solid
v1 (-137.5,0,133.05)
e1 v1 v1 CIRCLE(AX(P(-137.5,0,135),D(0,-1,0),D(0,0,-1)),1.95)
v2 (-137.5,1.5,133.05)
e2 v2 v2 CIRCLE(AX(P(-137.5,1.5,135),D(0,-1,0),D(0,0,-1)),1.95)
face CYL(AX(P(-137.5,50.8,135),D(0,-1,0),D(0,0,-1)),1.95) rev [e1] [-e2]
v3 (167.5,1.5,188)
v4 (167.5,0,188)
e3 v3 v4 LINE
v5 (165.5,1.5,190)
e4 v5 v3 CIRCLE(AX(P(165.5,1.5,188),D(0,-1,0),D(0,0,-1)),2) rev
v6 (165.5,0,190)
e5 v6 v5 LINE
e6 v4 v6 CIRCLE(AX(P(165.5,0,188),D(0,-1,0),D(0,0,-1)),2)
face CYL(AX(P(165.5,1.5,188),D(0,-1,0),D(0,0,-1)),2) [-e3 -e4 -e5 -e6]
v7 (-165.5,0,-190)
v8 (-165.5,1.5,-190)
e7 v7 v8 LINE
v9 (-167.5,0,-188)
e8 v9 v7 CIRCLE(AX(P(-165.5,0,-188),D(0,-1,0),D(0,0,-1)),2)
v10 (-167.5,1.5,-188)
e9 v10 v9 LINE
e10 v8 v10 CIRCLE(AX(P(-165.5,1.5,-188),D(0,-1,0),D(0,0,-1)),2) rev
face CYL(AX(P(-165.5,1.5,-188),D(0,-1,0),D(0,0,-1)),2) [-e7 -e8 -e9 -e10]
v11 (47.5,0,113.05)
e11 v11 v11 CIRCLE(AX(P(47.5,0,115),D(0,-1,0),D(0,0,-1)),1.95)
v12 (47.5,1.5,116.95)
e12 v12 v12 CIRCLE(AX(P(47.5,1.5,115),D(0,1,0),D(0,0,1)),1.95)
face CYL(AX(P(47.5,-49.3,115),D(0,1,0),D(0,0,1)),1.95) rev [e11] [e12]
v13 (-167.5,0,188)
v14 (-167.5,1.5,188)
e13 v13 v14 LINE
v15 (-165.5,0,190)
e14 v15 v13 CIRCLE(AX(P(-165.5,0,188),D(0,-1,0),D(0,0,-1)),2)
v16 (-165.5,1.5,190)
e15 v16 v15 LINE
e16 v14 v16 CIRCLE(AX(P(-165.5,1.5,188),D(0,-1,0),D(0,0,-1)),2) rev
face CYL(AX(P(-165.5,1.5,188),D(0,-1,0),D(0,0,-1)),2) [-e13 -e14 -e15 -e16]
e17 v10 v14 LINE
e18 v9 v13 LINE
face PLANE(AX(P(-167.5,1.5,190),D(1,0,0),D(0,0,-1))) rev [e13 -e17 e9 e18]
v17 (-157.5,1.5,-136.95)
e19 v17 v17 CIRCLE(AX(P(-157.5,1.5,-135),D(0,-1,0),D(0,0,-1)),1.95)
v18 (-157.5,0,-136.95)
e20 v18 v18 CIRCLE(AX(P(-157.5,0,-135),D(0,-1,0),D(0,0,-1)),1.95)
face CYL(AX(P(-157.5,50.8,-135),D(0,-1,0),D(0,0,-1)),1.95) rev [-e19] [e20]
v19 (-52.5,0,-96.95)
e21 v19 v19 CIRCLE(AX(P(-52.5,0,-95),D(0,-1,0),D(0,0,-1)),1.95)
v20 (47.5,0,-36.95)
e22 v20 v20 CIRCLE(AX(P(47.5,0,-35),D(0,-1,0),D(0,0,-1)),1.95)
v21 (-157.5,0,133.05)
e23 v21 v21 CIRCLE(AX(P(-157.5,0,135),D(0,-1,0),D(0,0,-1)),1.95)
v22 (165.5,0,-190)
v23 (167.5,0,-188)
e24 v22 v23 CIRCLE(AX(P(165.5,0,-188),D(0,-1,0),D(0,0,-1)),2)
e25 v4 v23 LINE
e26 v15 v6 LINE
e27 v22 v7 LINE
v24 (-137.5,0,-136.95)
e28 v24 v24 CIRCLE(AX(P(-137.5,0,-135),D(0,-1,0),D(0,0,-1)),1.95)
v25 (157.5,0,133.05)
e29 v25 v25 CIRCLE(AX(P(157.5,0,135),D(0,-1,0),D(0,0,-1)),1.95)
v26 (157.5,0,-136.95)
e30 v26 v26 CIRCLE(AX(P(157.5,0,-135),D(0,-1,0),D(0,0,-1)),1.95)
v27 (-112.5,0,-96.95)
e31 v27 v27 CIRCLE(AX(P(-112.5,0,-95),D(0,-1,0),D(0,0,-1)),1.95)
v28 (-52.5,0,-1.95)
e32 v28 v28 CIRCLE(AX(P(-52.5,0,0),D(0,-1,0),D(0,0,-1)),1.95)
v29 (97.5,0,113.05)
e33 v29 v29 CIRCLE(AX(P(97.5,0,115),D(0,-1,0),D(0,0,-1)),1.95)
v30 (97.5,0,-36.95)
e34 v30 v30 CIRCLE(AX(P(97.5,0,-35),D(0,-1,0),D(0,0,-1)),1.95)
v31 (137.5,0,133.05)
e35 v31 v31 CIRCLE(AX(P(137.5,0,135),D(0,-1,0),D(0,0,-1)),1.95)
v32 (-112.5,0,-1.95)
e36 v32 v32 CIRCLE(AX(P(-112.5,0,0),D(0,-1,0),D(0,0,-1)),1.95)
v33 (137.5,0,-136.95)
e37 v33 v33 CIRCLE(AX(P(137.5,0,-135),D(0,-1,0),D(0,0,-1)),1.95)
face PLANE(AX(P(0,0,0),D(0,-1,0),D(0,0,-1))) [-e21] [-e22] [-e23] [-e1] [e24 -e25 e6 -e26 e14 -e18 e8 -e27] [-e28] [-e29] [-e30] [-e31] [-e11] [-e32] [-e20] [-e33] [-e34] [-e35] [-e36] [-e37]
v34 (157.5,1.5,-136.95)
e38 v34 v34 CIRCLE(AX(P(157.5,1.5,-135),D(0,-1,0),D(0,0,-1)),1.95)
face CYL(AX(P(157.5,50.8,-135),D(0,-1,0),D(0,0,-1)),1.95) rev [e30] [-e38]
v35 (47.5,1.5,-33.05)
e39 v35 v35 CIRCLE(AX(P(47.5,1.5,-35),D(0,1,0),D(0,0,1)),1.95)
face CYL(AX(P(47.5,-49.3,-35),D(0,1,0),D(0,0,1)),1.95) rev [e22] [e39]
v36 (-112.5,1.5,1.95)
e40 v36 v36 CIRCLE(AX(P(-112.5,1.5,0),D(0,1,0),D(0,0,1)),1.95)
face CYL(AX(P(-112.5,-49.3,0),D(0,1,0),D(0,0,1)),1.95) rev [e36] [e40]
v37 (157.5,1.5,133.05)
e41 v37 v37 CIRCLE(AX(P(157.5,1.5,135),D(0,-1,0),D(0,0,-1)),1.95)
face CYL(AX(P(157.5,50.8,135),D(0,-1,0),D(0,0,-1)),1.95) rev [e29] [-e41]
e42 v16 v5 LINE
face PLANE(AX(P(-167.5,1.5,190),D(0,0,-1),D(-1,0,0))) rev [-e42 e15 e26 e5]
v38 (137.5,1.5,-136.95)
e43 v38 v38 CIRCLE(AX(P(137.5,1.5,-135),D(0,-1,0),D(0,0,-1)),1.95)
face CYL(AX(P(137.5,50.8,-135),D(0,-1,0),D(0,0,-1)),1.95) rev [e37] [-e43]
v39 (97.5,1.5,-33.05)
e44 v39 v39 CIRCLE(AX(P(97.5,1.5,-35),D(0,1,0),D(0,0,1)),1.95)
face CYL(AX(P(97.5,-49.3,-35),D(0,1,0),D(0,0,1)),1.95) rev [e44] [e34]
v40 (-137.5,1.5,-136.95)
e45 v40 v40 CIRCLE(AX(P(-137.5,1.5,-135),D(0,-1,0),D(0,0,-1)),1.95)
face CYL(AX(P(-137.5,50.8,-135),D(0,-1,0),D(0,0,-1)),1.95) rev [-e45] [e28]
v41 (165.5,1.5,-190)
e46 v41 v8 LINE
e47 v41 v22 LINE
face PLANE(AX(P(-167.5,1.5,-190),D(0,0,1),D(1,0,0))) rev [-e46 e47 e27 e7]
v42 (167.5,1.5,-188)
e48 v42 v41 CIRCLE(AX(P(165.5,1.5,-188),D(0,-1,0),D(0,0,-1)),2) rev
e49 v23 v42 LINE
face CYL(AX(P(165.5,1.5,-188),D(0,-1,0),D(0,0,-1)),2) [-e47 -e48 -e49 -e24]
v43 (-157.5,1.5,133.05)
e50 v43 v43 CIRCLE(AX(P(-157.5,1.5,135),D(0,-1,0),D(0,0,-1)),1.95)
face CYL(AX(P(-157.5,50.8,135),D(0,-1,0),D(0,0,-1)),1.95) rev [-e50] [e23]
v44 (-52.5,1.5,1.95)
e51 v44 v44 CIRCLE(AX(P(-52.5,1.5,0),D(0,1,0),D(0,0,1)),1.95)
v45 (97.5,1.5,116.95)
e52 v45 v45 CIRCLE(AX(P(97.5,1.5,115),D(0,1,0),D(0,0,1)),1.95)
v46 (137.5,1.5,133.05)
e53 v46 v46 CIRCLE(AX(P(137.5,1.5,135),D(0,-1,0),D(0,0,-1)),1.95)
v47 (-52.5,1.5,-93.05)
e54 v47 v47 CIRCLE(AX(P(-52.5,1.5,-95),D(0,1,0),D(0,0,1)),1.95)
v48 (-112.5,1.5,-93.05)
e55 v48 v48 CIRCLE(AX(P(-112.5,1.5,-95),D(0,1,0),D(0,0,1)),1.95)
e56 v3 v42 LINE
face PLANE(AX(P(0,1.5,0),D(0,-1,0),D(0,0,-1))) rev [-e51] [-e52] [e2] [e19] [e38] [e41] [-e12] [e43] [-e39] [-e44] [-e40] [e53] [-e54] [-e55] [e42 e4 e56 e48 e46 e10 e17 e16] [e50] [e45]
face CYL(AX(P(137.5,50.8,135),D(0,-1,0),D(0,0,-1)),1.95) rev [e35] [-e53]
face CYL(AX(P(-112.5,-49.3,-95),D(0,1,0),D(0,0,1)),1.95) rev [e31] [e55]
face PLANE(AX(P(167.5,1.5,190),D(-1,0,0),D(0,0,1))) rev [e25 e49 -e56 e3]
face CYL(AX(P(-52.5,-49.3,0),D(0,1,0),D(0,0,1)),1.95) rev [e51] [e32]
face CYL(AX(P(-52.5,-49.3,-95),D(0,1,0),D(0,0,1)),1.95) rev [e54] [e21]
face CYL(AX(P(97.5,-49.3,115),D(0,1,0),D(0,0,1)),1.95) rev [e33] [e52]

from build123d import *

# Parameters (mm, degrees)
SKETCH1_W           = 335
SKETCH1_H           = 380
BOSS_EXTRUDE1_DEPTH = 1.5
SKETCH12_R          = 1.95
CUT_EXTRUDE3_DEPTH  = 50.8
SKETCH6_R           = 1.95
CUT_EXTRUDE4_DEPTH  = 50.8
SKETCH7_R           = 1.95
CUT_EXTRUDE5_DEPTH  = 50.8
FILLET1_R           = 2


with BuildPart() as part:
    # Sketch1 → Boss-Extrude1 (new body)
    with BuildSketch(Plane(origin=(0, 0, 0), x_dir=(1, 0, 0), z_dir=(0, 1, 0))):
        Rectangle(SKETCH1_W, SKETCH1_H)
    extrude(amount=BOSS_EXTRUDE1_DEPTH)

    # Sketch12 → Cut-Extrude3 (cut)
    with BuildSketch(Plane(origin=(0, 0, 0), x_dir=(-1, 0, 0), z_dir=(0, -1, 0))):
        with Locations((-137.5, -135)):
            Circle(SKETCH12_R)
        with Locations((-157.5, 135)):
            Circle(SKETCH12_R)
        with Locations((-157.5, -135)):
            Circle(SKETCH12_R)
        with Locations((-137.5, 135)):
            Circle(SKETCH12_R)
        with Locations((157.5, -135)):
            Circle(SKETCH12_R)
        with Locations((137.5, 135)):
            Circle(SKETCH12_R)
        with Locations((157.5, 135)):
            Circle(SKETCH12_R)
        with Locations((137.5, -135)):
            Circle(SKETCH12_R)
    extrude(amount=-CUT_EXTRUDE3_DEPTH, mode=Mode.SUBTRACT)

    # Sketch6 → Cut-Extrude4 (cut)
    with BuildSketch(Plane(origin=(0, 1.5, 0), x_dir=(1, 0, 0), z_dir=(0, 1, 0))):
        with Locations((97.5, 35)):
            Circle(SKETCH6_R)
        with Locations((47.5, 35)):
            Circle(SKETCH6_R)
        with Locations((97.5, -115)):
            Circle(SKETCH6_R)
        with Locations((47.5, -115)):
            Circle(SKETCH6_R)
    extrude(amount=-CUT_EXTRUDE4_DEPTH, mode=Mode.SUBTRACT)

    # Sketch7 → Cut-Extrude5 (cut)
    with BuildSketch(Plane(origin=(0, 1.5, 0), x_dir=(1, 0, 0), z_dir=(0, 1, 0))):
        with Locations((-112.5, 95)):
            Circle(SKETCH7_R)
        with Locations((-52.5, 95)):
            Circle(SKETCH7_R)
        with Locations((-52.5, 0)):
            Circle(SKETCH7_R)
        with Locations((-112.5, 0)):
            Circle(SKETCH7_R)
    extrude(amount=-CUT_EXTRUDE5_DEPTH, mode=Mode.SUBTRACT)

    # Fillet1
    fillet1_edges = [part.edges().sort_by_distance(p)[0] for p in [
        (167.5, 0.75, -190),
        (167.5, 0.75, 190),
        (-167.5, 0.75, 190),
        (-167.5, 0.75, -190),
    ]]
    fillet(fillet1_edges, radius=FILLET1_R)


solid = part.part
